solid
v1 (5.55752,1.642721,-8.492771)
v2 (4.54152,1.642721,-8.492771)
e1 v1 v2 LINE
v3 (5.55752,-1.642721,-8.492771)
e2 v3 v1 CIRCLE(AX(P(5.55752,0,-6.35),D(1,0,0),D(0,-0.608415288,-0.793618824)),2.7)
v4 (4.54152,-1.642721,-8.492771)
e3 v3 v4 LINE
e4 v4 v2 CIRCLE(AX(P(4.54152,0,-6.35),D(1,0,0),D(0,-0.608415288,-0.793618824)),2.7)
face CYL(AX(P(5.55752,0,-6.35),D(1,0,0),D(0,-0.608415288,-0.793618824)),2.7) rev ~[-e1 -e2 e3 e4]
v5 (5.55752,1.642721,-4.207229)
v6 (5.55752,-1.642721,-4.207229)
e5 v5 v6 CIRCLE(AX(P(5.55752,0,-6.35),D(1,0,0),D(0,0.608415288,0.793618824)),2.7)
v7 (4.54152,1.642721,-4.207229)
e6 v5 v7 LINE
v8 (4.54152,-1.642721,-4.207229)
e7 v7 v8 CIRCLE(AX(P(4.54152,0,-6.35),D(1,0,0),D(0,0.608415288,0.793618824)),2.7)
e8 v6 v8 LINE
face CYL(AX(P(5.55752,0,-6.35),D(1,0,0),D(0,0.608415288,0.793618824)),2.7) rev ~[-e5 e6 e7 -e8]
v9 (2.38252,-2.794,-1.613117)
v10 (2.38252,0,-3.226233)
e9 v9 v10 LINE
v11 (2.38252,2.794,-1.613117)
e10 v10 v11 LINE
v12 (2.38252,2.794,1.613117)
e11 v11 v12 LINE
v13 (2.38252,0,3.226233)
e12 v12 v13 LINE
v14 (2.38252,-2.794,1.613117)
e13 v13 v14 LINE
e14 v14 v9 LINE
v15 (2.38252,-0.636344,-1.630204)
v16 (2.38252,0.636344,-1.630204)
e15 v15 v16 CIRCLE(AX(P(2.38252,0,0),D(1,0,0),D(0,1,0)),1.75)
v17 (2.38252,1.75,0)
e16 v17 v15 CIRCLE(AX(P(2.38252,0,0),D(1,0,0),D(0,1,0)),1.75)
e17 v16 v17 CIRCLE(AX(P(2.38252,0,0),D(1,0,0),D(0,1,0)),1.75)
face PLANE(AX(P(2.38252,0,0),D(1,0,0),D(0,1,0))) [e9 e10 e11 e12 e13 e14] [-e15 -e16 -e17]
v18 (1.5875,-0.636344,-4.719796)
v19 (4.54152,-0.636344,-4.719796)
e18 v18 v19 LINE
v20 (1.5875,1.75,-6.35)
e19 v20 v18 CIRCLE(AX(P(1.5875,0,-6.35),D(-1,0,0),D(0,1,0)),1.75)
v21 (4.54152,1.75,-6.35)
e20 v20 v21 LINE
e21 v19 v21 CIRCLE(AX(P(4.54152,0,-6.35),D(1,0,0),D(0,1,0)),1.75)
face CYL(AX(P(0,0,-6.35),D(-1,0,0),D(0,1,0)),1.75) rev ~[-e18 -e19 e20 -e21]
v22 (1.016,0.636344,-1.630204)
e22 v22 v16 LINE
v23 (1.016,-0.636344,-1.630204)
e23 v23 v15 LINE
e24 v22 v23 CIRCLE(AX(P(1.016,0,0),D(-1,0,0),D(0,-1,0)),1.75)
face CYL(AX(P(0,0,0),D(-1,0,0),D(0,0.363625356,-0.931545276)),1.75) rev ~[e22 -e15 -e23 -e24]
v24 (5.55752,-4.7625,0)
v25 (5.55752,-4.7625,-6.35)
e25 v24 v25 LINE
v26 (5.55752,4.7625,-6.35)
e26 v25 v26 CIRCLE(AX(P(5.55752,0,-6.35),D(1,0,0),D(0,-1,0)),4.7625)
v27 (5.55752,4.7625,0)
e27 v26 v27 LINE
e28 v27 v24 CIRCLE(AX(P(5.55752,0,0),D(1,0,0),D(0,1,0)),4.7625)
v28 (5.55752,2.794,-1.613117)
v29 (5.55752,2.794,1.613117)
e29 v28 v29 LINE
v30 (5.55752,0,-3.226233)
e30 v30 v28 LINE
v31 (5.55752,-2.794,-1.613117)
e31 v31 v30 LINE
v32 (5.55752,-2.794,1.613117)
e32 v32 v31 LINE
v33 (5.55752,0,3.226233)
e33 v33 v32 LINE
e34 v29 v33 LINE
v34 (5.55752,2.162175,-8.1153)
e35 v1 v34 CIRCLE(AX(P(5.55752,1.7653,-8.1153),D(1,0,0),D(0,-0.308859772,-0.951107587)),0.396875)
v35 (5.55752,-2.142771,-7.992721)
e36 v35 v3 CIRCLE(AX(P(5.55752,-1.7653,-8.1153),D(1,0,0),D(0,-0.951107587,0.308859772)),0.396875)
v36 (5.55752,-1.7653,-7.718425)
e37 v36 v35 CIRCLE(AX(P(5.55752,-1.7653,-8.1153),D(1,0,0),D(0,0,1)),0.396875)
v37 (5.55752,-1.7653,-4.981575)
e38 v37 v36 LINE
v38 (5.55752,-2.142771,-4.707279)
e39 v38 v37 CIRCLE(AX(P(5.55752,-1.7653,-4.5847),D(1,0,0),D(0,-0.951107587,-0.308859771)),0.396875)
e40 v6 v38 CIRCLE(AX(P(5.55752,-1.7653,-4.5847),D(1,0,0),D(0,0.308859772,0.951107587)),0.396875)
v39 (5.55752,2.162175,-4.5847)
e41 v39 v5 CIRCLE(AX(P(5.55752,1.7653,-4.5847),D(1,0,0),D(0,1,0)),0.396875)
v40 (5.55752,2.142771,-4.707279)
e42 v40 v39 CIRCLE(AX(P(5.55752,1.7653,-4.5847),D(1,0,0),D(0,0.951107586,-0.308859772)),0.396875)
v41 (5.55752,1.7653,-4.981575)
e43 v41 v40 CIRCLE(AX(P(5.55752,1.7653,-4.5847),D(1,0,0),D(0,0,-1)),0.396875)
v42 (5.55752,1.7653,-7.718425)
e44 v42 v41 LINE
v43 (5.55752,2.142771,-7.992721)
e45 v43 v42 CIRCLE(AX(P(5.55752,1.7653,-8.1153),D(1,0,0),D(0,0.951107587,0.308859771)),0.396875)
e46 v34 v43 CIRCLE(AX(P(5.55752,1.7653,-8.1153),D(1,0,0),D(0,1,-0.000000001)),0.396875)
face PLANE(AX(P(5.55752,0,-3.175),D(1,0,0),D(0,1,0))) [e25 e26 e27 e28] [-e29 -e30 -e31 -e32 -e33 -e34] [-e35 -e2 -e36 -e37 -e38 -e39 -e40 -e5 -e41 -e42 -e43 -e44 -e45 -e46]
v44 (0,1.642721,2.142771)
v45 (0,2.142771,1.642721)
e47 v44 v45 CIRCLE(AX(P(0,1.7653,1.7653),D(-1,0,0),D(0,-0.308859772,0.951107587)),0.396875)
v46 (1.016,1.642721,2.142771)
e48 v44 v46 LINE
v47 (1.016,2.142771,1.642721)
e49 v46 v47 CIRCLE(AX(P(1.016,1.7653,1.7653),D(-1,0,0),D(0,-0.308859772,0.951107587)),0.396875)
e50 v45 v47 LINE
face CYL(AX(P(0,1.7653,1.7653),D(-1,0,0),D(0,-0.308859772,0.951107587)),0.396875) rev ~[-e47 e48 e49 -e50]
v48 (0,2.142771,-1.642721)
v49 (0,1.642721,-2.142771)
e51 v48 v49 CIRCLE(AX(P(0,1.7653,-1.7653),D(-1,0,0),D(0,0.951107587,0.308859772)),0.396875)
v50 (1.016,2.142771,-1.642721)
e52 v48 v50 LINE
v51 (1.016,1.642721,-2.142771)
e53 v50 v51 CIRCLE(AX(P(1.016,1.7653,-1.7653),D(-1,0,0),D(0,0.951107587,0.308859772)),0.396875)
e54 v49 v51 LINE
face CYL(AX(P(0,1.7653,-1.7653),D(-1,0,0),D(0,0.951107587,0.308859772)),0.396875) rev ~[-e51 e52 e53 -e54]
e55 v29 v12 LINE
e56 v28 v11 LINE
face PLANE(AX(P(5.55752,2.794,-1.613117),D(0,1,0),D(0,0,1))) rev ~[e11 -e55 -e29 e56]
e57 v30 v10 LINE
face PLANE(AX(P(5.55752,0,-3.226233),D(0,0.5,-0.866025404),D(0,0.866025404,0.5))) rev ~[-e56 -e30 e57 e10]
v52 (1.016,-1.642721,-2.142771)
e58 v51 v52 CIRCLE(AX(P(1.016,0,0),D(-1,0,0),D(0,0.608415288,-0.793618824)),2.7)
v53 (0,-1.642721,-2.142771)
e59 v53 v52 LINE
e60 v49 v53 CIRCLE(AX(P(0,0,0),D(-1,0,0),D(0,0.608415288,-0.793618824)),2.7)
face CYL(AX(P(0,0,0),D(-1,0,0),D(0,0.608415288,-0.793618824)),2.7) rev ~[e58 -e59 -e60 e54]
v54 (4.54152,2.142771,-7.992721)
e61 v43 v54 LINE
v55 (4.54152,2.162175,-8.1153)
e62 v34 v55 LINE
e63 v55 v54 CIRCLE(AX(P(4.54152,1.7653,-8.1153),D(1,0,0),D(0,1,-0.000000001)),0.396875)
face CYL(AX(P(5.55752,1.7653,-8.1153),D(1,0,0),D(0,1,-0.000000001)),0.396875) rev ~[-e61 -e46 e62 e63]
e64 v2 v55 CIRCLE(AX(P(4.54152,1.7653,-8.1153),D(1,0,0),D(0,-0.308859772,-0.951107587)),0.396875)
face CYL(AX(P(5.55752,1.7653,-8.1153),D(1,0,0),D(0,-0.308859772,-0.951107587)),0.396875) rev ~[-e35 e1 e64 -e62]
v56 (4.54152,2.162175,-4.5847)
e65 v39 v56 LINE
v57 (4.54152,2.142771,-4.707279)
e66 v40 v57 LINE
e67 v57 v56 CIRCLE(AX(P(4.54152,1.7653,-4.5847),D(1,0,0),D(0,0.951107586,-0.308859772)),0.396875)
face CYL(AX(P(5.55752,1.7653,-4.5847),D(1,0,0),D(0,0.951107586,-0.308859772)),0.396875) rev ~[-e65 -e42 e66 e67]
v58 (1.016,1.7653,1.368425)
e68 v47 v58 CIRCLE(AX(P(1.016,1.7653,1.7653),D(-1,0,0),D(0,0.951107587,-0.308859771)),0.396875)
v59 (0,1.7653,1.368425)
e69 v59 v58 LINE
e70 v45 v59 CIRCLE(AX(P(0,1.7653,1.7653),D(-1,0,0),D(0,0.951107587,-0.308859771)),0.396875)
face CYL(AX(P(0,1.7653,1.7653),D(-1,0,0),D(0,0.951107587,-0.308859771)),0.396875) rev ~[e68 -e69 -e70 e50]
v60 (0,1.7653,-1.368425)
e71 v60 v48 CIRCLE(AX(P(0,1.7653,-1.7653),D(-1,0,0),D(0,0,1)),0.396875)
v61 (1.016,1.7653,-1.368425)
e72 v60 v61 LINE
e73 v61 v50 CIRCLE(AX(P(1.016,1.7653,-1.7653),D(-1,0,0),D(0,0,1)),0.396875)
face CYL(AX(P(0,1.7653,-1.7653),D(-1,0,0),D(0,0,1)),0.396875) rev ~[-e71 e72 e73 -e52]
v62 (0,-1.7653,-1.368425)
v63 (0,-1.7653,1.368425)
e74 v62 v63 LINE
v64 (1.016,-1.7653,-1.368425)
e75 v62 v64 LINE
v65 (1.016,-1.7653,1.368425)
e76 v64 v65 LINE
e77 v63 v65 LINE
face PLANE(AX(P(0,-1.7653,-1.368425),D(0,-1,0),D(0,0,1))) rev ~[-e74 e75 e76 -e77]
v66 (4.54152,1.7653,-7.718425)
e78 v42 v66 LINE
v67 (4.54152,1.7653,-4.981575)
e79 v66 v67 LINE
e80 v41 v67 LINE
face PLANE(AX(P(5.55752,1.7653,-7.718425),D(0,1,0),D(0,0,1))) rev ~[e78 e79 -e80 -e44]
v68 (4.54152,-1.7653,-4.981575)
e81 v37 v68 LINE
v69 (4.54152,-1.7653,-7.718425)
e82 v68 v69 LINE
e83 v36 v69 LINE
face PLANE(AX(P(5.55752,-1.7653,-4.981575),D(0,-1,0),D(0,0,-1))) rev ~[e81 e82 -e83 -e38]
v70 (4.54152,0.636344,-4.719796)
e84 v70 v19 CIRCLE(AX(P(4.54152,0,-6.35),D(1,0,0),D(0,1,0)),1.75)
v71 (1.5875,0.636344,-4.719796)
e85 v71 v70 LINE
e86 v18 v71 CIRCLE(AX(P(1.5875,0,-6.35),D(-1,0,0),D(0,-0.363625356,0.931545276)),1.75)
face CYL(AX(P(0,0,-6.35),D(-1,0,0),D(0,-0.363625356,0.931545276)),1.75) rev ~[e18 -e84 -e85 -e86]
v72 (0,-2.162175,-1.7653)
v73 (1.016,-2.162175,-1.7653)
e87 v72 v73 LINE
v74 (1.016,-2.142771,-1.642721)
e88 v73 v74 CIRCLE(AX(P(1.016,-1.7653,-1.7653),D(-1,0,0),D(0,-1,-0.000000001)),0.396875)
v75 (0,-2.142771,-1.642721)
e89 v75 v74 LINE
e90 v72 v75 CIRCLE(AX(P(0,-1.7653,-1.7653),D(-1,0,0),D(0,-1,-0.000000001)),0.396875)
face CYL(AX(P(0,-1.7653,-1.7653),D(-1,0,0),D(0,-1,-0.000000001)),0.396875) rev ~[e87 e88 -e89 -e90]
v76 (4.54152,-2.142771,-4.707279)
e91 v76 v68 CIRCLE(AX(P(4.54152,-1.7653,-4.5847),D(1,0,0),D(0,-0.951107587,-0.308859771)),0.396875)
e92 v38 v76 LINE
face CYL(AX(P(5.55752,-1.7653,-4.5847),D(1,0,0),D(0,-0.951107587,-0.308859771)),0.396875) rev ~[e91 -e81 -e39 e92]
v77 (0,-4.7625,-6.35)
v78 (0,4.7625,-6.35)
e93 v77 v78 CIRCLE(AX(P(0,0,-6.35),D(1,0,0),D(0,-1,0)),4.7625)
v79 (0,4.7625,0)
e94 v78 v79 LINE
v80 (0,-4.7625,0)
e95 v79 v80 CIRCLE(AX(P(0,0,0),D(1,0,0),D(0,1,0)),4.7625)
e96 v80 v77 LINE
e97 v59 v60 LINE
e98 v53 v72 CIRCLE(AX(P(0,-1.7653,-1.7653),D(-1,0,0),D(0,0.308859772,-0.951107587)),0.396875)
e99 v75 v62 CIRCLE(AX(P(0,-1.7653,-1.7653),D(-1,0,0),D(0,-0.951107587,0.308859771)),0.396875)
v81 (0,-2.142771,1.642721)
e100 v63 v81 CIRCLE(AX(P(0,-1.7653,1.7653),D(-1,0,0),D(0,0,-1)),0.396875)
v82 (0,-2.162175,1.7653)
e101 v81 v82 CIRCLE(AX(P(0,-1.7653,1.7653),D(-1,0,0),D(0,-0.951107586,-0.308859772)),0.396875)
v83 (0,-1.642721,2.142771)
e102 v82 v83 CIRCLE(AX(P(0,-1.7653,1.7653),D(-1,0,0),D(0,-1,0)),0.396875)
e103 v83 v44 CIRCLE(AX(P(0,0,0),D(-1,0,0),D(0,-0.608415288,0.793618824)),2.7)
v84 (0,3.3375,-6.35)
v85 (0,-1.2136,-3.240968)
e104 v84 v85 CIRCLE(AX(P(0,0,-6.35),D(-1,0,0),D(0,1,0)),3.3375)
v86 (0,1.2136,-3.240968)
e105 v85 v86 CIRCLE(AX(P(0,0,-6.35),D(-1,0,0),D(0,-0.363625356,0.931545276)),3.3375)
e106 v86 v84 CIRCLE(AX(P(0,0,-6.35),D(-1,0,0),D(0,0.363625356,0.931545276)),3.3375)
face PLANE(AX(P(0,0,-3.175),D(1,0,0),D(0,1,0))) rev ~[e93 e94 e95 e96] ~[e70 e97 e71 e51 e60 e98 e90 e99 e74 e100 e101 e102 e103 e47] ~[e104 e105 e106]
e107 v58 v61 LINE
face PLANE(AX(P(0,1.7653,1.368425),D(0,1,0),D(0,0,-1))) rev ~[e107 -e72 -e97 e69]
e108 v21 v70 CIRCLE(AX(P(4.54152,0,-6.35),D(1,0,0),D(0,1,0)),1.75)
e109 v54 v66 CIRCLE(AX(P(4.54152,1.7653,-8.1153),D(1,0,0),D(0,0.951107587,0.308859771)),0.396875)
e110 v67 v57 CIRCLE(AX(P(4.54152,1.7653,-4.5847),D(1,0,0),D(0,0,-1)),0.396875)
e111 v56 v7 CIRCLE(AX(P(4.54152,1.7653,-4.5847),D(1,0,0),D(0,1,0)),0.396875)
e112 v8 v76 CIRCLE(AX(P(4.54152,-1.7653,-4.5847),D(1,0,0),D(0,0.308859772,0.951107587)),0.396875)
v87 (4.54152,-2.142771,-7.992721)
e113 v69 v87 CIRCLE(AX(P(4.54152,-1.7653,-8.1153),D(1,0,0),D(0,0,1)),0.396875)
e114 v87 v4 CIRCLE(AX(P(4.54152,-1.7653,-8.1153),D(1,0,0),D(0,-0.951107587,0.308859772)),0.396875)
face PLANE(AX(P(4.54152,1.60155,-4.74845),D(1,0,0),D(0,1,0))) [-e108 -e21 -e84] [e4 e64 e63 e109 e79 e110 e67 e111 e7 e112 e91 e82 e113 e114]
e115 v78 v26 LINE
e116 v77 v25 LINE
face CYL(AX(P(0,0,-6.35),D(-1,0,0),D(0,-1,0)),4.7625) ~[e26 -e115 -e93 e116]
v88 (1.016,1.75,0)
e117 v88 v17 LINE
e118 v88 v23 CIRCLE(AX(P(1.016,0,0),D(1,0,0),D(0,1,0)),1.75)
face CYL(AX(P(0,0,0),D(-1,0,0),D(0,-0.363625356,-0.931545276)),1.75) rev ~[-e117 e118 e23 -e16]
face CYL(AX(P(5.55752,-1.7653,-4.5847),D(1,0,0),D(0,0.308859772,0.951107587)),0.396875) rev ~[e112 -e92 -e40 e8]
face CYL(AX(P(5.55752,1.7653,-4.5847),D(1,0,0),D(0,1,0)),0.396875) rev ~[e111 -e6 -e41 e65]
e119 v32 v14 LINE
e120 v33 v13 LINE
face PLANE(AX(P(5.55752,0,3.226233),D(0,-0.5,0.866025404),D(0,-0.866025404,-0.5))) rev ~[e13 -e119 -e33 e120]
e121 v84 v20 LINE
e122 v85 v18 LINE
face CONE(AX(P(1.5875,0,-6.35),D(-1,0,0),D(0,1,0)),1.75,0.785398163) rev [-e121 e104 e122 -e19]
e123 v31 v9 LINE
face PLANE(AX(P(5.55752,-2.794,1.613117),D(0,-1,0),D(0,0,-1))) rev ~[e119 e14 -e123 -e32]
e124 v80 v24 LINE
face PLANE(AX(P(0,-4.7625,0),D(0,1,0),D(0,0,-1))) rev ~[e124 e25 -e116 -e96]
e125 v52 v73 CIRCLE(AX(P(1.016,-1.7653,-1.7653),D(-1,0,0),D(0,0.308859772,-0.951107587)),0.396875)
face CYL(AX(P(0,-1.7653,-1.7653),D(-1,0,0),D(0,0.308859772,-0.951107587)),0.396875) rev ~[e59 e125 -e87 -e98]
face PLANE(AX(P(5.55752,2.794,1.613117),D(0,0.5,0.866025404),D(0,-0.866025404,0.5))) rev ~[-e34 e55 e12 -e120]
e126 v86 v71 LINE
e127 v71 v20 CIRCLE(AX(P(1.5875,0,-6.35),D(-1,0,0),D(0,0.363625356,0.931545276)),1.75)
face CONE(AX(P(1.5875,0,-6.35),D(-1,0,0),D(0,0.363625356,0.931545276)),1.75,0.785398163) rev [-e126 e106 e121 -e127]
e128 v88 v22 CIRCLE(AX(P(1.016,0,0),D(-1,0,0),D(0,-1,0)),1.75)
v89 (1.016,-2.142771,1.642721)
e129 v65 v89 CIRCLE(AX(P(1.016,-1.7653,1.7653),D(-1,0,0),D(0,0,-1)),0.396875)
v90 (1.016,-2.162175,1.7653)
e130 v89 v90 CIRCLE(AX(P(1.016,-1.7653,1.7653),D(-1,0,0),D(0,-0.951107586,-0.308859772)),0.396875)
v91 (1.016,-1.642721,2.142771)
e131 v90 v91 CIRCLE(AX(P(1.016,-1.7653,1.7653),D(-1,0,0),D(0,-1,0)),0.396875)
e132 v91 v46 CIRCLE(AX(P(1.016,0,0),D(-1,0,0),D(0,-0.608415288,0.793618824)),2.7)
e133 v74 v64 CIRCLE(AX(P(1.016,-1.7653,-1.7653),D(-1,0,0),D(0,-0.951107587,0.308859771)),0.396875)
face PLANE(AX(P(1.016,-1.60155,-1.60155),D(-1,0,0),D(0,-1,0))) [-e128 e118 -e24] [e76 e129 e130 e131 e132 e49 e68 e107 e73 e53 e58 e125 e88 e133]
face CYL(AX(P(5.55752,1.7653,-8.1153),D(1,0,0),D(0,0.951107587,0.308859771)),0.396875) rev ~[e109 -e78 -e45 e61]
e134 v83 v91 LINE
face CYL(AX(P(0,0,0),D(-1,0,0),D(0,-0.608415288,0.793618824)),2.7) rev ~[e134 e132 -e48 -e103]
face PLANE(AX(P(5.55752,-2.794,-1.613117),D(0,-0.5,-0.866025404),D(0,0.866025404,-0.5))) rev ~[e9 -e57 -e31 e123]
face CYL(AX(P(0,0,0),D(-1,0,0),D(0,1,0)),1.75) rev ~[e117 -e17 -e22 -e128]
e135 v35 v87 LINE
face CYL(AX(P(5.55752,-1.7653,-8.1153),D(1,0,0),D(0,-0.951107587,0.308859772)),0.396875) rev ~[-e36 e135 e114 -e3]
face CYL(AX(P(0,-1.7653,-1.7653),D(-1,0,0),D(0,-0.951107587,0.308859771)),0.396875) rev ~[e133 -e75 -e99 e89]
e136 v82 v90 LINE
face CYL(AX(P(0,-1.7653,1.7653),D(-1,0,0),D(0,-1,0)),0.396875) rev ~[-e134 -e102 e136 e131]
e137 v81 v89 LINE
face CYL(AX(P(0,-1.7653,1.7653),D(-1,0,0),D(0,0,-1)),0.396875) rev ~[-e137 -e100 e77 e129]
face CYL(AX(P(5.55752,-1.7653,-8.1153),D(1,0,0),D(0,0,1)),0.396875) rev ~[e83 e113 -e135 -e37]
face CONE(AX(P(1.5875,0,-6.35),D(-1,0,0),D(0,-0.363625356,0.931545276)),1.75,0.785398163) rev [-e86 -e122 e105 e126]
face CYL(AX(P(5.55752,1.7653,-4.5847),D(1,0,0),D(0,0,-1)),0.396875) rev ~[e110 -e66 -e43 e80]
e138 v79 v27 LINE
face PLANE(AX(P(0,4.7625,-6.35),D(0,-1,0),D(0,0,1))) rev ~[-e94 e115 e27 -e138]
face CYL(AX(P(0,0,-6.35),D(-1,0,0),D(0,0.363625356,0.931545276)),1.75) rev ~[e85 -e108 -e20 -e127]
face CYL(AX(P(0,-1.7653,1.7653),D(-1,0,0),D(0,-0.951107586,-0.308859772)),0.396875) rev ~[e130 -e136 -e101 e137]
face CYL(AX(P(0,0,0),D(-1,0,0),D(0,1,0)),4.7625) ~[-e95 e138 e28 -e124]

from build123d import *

# Parameters (mm, degrees)
F1_DEPTH = 5.55752
F2_R     = 1.75
F3_DEPTH = 1.016
F4_R     = 1.75
F5_DEPTH = 1.016
F6_DEPTH = 3.175
F7_SIZE  = 1.5875


# Not quite as in the source:
# - a feature names something its author has since deleted; it is built from what else it names


with BuildPart() as f1:
    # F0 (on Right) → F1 (new body)
    with BuildSketch(Plane.YZ):
        with BuildLine():
            ThreePointArc((0.636344373, -4.7197957677), (2.2310225415, -4.2076055743), (3.5497579143, -3.175))
            ThreePointArc((3.5497579143, -3.175), (2.2310225415, -2.1423944257), (0.636344373, -1.6302042323))
            ThreePointArc((0.636344373, -1.6302042323), (0, -1.75), (-0.636344373, -1.6302042323))
            ThreePointArc((-0.636344373, -1.6302042323), (-2.2310225415, -2.1423944257), (-3.5497579143, -3.175))
            ThreePointArc((-3.5497579143, -3.175), (-2.2310225415, -4.2076055743), (-0.636344373, -4.7197957677))
            ThreePointArc((-0.636344373, -4.7197957677), (0, -4.6), (0.636344373, -4.7197957677))
        make_face()
        with BuildLine():
            ThreePointArc((3.5497579143, -3.175), (4.4489958596, -1.6993652025), (4.7625, 0))
            ThreePointArc((4.7625, 0), (0, 4.7625), (-4.7625, 0))
            ThreePointArc((-4.7625, 0), (-4.4489958596, -1.6993652025), (-3.5497579143, -3.175))
            ThreePointArc((-3.5497579143, -3.175), (-2.2310225415, -2.1423944257), (-0.636344373, -1.6302042323))
            ThreePointArc((-0.636344373, -1.6302042323), (-0.9871416685, 1.4450091094), (1.75, 0))
            ThreePointArc((1.75, 0), (1.4450091094, -0.9871416685), (0.636344373, -1.6302042323))
            ThreePointArc((0.636344373, -1.6302042323), (2.2310225415, -2.1423944257), (3.5497579143, -3.175))
        make_face()
        with BuildLine():
            Line((4.7625, -6.35), (4.7625, 0))
            ThreePointArc((4.7625, 0), (4.4489958596, -1.6993652025), (3.5497579143, -3.175))
            ThreePointArc((3.5497579143, -3.175), (4.4489958596, -4.6506347975), (4.7625, -6.35))
        make_face()
        with BuildLine():
            ThreePointArc((4.7625, -6.35), (4.4489958596, -4.6506347975), (3.5497579143, -3.175))
            ThreePointArc((3.5497579143, -3.175), (2.2310225415, -4.2076055743), (0.636344373, -4.7197957677))
            ThreePointArc((0.636344373, -4.7197957677), (1.4450091094, -5.3628583315), (1.75, -6.35))
            ThreePointArc((1.75, -6.35), (-0.9871416685, -7.7950091094), (-0.636344373, -4.7197957677))
            ThreePointArc((-0.636344373, -4.7197957677), (-2.2310225415, -4.2076055743), (-3.5497579143, -3.175))
            ThreePointArc((-3.5497579143, -3.175), (-4.4489958596, -4.6506347975), (-4.7625, -6.35))
            ThreePointArc((-4.7625, -6.35), (0, -11.1125), (4.7625, -6.35))
        make_face()
        with BuildLine():
            ThreePointArc((-3.5497579143, -3.175), (-4.4489958596, -1.6993652025), (-4.7625, 0))
            Line((-4.7625, 0), (-4.7625, -6.35))
            ThreePointArc((-4.7625, -6.35), (-4.4489958596, -4.6506347975), (-3.5497579143, -3.175))
        make_face()
    extrude(amount=F1_DEPTH)

    # F2 (on face) → F3 (cut)
    with BuildSketch(Plane.YZ.offset(5.55752)):
        with BuildLine():
            ThreePointArc((1.368425, -4.5847), (1.4846669962, -4.8653330038), (1.7653, -4.981575))
            Line((1.7653, -4.981575), (1.7653, -4.5847))
            Line((1.7653, -4.5847), (1.368425, -4.5847))
        make_face()
        with BuildLine():
            Line((1.7653, -4.5847), (1.7653, -4.981575))
            ThreePointArc((1.7653, -4.981575), (1.9986038099, -4.9057593371), (2.1427708235, -4.7072787218))
            ThreePointArc((2.1427708235, -4.7072787218), (1.9091883092, -4.4408116908), (1.6427212782, -4.2072291765))
            ThreePointArc((1.6427212782, -4.2072291765), (1.4442406629, -4.3513961901), (1.368425, -4.5847))
            Line((1.368425, -4.5847), (1.7653, -4.5847))
        make_face()
        with BuildLine():
            ThreePointArc((1.7653, -7.718425), (1.4846669962, -7.8346669962), (1.368425, -8.1153))
            Line((1.368425, -8.1153), (1.7653, -8.1153))
            Line((1.7653, -8.1153), (1.7653, -7.718425))
        make_face()
        with BuildLine():
            Line((1.7653, -8.1153), (1.368425, -8.1153))
            ThreePointArc((1.368425, -8.1153), (1.4442406629, -8.3486038099), (1.6427212782, -8.4927708235))
            ThreePointArc((1.6427212782, -8.4927708235), (1.9091883092, -8.2591883092), (2.1427708235, -7.9927212782))
            ThreePointArc((2.1427708235, -7.9927212782), (1.9986038099, -7.7942406629), (1.7653, -7.718425))
            Line((1.7653, -7.718425), (1.7653, -8.1153))
        make_face()
        with BuildLine():
            Line((-1.368425, -8.1153), (-1.7653, -8.1153))
            Line((-1.7653, -8.1153), (-1.7653, -7.718425))
            ThreePointArc((-1.7653, -7.718425), (-1.9986038099, -7.7942406629), (-2.1427708235, -7.9927212782))
            ThreePointArc((-2.1427708235, -7.9927212782), (-1.9091883092, -8.2591883092), (-1.6427212782, -8.4927708235))
            ThreePointArc((-1.6427212782, -8.4927708235), (-1.4442406629, -8.3486038099), (-1.368425, -8.1153))
        make_face()
        with BuildLine():
            Line((-1.7653, -7.718425), (-1.7653, -8.1153))
            Line((-1.7653, -8.1153), (-1.368425, -8.1153))
            ThreePointArc((-1.368425, -8.1153), (-1.4846669962, -7.8346669962), (-1.7653, -7.718425))
        make_face()
        with BuildLine():
            Line((-1.7653, -4.5847), (-1.7653, -4.981575))
            ThreePointArc((-1.7653, -4.981575), (-1.4846669962, -4.8653330038), (-1.368425, -4.5847))
            Line((-1.368425, -4.5847), (-1.7653, -4.5847))
        make_face()
        with BuildLine():
            ThreePointArc((-2.1427708235, -4.7072787218), (-1.9986038099, -4.9057593371), (-1.7653, -4.981575))
            Line((-1.7653, -4.981575), (-1.7653, -4.5847))
            Line((-1.7653, -4.5847), (-1.368425, -4.5847))
            ThreePointArc((-1.368425, -4.5847), (-1.4442406629, -4.3513961901), (-1.6427212782, -4.2072291765))
            ThreePointArc((-1.6427212782, -4.2072291765), (-1.9091883092, -4.4408116908), (-2.1427708235, -4.7072787218))
        make_face()
        with BuildLine():
            ThreePointArc((-1.7653, -7.718425), (-1.4846669962, -7.8346669962), (-1.368425, -8.1153))
            Line((-1.368425, -8.1153), (1.368425, -8.1153))
            ThreePointArc((1.368425, -8.1153), (1.4846669962, -7.8346669962), (1.7653, -7.718425))
            Line((1.7653, -7.718425), (1.7653, -4.981575))
            ThreePointArc((1.7653, -4.981575), (1.4846669962, -4.8653330038), (1.368425, -4.5847))
            Line((1.368425, -4.5847), (-1.368425, -4.5847))
            ThreePointArc((-1.368425, -4.5847), (-1.4846669962, -4.8653330038), (-1.7653, -4.981575))
            Line((-1.7653, -4.981575), (-1.7653, -7.718425))
        make_face()
        with Locations((0, -6.35)):
            Circle(F2_R, mode=Mode.SUBTRACT)
        with BuildLine():
            ThreePointArc((-1.6427212782, -4.2072291765), (-2.0459330038, -4.3040669962), (-2.1427708235, -4.7072787218))
            ThreePointArc((-2.1427708235, -4.7072787218), (-1.9091883092, -4.4408116908), (-1.6427212782, -4.2072291765))
        make_face()
        with BuildLine():
            ThreePointArc((1.6427212782, -4.2072291765), (1.9091883092, -4.4408116908), (2.1427708235, -4.7072787218))
            ThreePointArc((2.1427708235, -4.7072787218), (2.1572939405, -4.6467525283), (2.162175, -4.5847))
            ThreePointArc((2.162175, -4.5847), (1.9986038099, -4.2636406629), (1.6427212782, -4.2072291765))
        make_face()
        with BuildLine():
            ThreePointArc((2.1427708235, -7.9927212782), (1.9091883092, -8.2591883092), (1.6427212782, -8.4927708235))
            ThreePointArc((1.6427212782, -8.4927708235), (1.9986038099, -8.4363593371), (2.162175, -8.1153))
            ThreePointArc((2.162175, -8.1153), (2.1572939405, -8.0532474717), (2.1427708235, -7.9927212782))
        make_face()
        with BuildLine():
            ThreePointArc((-2.1427708235, -7.9927212782), (-2.0459330038, -8.3959330038), (-1.6427212782, -8.4927708235))
            ThreePointArc((-1.6427212782, -8.4927708235), (-1.9091883092, -8.2591883092), (-2.1427708235, -7.9927212782))
        make_face()
        with BuildLine():
            ThreePointArc((-1.6427212782, -4.2072291765), (-1.4442406629, -4.3513961901), (-1.368425, -4.5847))
            Line((-1.368425, -4.5847), (1.368425, -4.5847))
            ThreePointArc((1.368425, -4.5847), (1.4442406629, -4.3513961901), (1.6427212782, -4.2072291765))
            ThreePointArc((1.6427212782, -4.2072291765), (0, -3.65), (-1.6427212782, -4.2072291765))
        make_face()
        with BuildLine():
            Line((1.368425, -8.1153), (-1.368425, -8.1153))
            ThreePointArc((-1.368425, -8.1153), (-1.4442406629, -8.3486038099), (-1.6427212782, -8.4927708235))
            ThreePointArc((-1.6427212782, -8.4927708235), (0, -9.05), (1.6427212782, -8.4927708235))
            ThreePointArc((1.6427212782, -8.4927708235), (1.4442406629, -8.3486038099), (1.368425, -8.1153))
        make_face()
    extrude(amount=-F3_DEPTH, mode=Mode.SUBTRACT)

    # F4 (on face) → F5 (cut)
    with BuildSketch(Plane(origin=(0, 0, 0), x_dir=(0, -1, 0), z_dir=(-1, 0, 0))):
        with BuildLine():
            ThreePointArc((1.7653, -1.368425), (1.4846669962, -1.4846669962), (1.368425, -1.7653))
            Line((1.368425, -1.7653), (1.7653, -1.7653))
            Line((1.7653, -1.7653), (1.7653, -1.368425))
        make_face()
        with BuildLine():
            Line((1.7653, -1.7653), (1.368425, -1.7653))
            ThreePointArc((1.368425, -1.7653), (1.4442406629, -1.9986038099), (1.6427212782, -2.1427708235))
            ThreePointArc((1.6427212782, -2.1427708235), (1.9091883092, -1.9091883092), (2.1427708235, -1.6427212782))
            ThreePointArc((2.1427708235, -1.6427212782), (1.9986038099, -1.4442406629), (1.7653, -1.368425))
            Line((1.7653, -1.368425), (1.7653, -1.7653))
        make_face()
        with BuildLine():
            Line((-1.7653, -1.368425), (-1.7653, -1.7653))
            Line((-1.7653, -1.7653), (-1.368425, -1.7653))
            ThreePointArc((-1.368425, -1.7653), (-1.4846669962, -1.4846669962), (-1.7653, -1.368425))
        make_face()
        with BuildLine():
            Line((-1.368425, -1.7653), (-1.7653, -1.7653))
            Line((-1.7653, -1.7653), (-1.7653, -1.368425))
            ThreePointArc((-1.7653, -1.368425), (-1.9986038099, -1.4442406629), (-2.1427708235, -1.6427212782))
            ThreePointArc((-2.1427708235, -1.6427212782), (-1.9091883092, -1.9091883092), (-1.6427212782, -2.1427708235))
            ThreePointArc((-1.6427212782, -2.1427708235), (-1.4442406629, -1.9986038099), (-1.368425, -1.7653))
        make_face()
        with BuildLine():
            Line((-1.7653, 1.7653), (-1.7653, 1.368425))
            ThreePointArc((-1.7653, 1.368425), (-1.4846669962, 1.4846669962), (-1.368425, 1.7653))
            Line((-1.368425, 1.7653), (-1.7653, 1.7653))
        make_face()
        with BuildLine():
            ThreePointArc((-2.1427708235, 1.6427212782), (-1.9986038099, 1.4442406629), (-1.7653, 1.368425))
            Line((-1.7653, 1.368425), (-1.7653, 1.7653))
            Line((-1.7653, 1.7653), (-1.368425, 1.7653))
            ThreePointArc((-1.368425, 1.7653), (-1.4442406629, 1.9986038099), (-1.6427212782, 2.1427708235))
            ThreePointArc((-1.6427212782, 2.1427708235), (-1.9091883092, 1.9091883092), (-2.1427708235, 1.6427212782))
        make_face()
        with BuildLine():
            ThreePointArc((1.368425, 1.7653), (1.4846669962, 1.4846669962), (1.7653, 1.368425))
            Line((1.7653, 1.368425), (1.7653, 1.7653))
            Line((1.7653, 1.7653), (1.368425, 1.7653))
        make_face()
        with BuildLine():
            Line((1.7653, 1.7653), (1.7653, 1.368425))
            ThreePointArc((1.7653, 1.368425), (1.9986038099, 1.4442406629), (2.1427708235, 1.6427212782))
            ThreePointArc((2.1427708235, 1.6427212782), (1.9091883092, 1.9091883092), (1.6427212782, 2.1427708235))
            ThreePointArc((1.6427212782, 2.1427708235), (1.4442406629, 1.9986038099), (1.368425, 1.7653))
            Line((1.368425, 1.7653), (1.7653, 1.7653))
        make_face()
        with BuildLine():
            ThreePointArc((-1.7653, -1.368425), (-1.4846669962, -1.4846669962), (-1.368425, -1.7653))
            Line((-1.368425, -1.7653), (1.368425, -1.7653))
            ThreePointArc((1.368425, -1.7653), (1.4846669962, -1.4846669962), (1.7653, -1.368425))
            Line((1.7653, -1.368425), (1.7653, 1.368425))
            ThreePointArc((1.7653, 1.368425), (1.4846669962, 1.4846669962), (1.368425, 1.7653))
            Line((1.368425, 1.7653), (-1.368425, 1.7653))
            ThreePointArc((-1.368425, 1.7653), (-1.4846669962, 1.4846669962), (-1.7653, 1.368425))
            Line((-1.7653, 1.368425), (-1.7653, -1.368425))
        make_face()
        Circle(F4_R, mode=Mode.SUBTRACT)
        with BuildLine():
            ThreePointArc((-1.6427212782, 2.1427708235), (-2.0459330038, 2.0459330038), (-2.1427708235, 1.6427212782))
            ThreePointArc((-2.1427708235, 1.6427212782), (-1.9091883092, 1.9091883092), (-1.6427212782, 2.1427708235))
        make_face()
        with BuildLine():
            ThreePointArc((-2.1427708235, -1.6427212782), (-2.0459330038, -2.0459330038), (-1.6427212782, -2.1427708235))
            ThreePointArc((-1.6427212782, -2.1427708235), (-1.9091883092, -1.9091883092), (-2.1427708235, -1.6427212782))
        make_face()
        with BuildLine():
            ThreePointArc((2.1427708235, -1.6427212782), (1.9091883092, -1.9091883092), (1.6427212782, -2.1427708235))
            ThreePointArc((1.6427212782, -2.1427708235), (1.9986038099, -2.0863593371), (2.162175, -1.7653))
            ThreePointArc((2.162175, -1.7653), (2.1572939405, -1.7032474717), (2.1427708235, -1.6427212782))
        make_face()
        with BuildLine():
            ThreePointArc((1.6427212782, 2.1427708235), (1.9091883092, 1.9091883092), (2.1427708235, 1.6427212782))
            ThreePointArc((2.1427708235, 1.6427212782), (2.1572939405, 1.7032474717), (2.162175, 1.7653))
            ThreePointArc((2.162175, 1.7653), (1.9986038099, 2.0863593371), (1.6427212782, 2.1427708235))
        make_face()
        with BuildLine():
            ThreePointArc((-1.6427212782, 2.1427708235), (-1.4442406629, 1.9986038099), (-1.368425, 1.7653))
            Line((-1.368425, 1.7653), (1.368425, 1.7653))
            ThreePointArc((1.368425, 1.7653), (1.4442406629, 1.9986038099), (1.6427212782, 2.1427708235))
            ThreePointArc((1.6427212782, 2.1427708235), (0, 2.7), (-1.6427212782, 2.1427708235))
        make_face()
        with BuildLine():
            Line((1.368425, -1.7653), (-1.368425, -1.7653))
            ThreePointArc((-1.368425, -1.7653), (-1.4442406629, -1.9986038099), (-1.6427212782, -2.1427708235))
            ThreePointArc((-1.6427212782, -2.1427708235), (0, -2.7), (1.6427212782, -2.1427708235))
            ThreePointArc((1.6427212782, -2.1427708235), (1.4442406629, -1.9986038099), (1.368425, -1.7653))
        make_face()
    extrude(amount=-F5_DEPTH, mode=Mode.SUBTRACT)

    # F2 (on face) → F6 (cut)
    with BuildSketch(Plane.YZ.offset(5.55752)):
        Polygon((-2.794, -1.6131166521), (0, -3.2262333042), (2.794, -1.6131166521), (2.794, 1.6131166521), (0, 3.2262333042), (-2.794, 1.6131166521), align=None)
        Circle(F2_R, mode=Mode.SUBTRACT)
    extrude(amount=-F6_DEPTH, mode=Mode.SUBTRACT)

    # F7
    f7_edges = [f1.edges().sort_by_distance(p)[0] for p in [
        (0, -0.636344, -7.980204),
    ]]
    chamfer(f7_edges, length=F7_SIZE)


solid = f1.part
